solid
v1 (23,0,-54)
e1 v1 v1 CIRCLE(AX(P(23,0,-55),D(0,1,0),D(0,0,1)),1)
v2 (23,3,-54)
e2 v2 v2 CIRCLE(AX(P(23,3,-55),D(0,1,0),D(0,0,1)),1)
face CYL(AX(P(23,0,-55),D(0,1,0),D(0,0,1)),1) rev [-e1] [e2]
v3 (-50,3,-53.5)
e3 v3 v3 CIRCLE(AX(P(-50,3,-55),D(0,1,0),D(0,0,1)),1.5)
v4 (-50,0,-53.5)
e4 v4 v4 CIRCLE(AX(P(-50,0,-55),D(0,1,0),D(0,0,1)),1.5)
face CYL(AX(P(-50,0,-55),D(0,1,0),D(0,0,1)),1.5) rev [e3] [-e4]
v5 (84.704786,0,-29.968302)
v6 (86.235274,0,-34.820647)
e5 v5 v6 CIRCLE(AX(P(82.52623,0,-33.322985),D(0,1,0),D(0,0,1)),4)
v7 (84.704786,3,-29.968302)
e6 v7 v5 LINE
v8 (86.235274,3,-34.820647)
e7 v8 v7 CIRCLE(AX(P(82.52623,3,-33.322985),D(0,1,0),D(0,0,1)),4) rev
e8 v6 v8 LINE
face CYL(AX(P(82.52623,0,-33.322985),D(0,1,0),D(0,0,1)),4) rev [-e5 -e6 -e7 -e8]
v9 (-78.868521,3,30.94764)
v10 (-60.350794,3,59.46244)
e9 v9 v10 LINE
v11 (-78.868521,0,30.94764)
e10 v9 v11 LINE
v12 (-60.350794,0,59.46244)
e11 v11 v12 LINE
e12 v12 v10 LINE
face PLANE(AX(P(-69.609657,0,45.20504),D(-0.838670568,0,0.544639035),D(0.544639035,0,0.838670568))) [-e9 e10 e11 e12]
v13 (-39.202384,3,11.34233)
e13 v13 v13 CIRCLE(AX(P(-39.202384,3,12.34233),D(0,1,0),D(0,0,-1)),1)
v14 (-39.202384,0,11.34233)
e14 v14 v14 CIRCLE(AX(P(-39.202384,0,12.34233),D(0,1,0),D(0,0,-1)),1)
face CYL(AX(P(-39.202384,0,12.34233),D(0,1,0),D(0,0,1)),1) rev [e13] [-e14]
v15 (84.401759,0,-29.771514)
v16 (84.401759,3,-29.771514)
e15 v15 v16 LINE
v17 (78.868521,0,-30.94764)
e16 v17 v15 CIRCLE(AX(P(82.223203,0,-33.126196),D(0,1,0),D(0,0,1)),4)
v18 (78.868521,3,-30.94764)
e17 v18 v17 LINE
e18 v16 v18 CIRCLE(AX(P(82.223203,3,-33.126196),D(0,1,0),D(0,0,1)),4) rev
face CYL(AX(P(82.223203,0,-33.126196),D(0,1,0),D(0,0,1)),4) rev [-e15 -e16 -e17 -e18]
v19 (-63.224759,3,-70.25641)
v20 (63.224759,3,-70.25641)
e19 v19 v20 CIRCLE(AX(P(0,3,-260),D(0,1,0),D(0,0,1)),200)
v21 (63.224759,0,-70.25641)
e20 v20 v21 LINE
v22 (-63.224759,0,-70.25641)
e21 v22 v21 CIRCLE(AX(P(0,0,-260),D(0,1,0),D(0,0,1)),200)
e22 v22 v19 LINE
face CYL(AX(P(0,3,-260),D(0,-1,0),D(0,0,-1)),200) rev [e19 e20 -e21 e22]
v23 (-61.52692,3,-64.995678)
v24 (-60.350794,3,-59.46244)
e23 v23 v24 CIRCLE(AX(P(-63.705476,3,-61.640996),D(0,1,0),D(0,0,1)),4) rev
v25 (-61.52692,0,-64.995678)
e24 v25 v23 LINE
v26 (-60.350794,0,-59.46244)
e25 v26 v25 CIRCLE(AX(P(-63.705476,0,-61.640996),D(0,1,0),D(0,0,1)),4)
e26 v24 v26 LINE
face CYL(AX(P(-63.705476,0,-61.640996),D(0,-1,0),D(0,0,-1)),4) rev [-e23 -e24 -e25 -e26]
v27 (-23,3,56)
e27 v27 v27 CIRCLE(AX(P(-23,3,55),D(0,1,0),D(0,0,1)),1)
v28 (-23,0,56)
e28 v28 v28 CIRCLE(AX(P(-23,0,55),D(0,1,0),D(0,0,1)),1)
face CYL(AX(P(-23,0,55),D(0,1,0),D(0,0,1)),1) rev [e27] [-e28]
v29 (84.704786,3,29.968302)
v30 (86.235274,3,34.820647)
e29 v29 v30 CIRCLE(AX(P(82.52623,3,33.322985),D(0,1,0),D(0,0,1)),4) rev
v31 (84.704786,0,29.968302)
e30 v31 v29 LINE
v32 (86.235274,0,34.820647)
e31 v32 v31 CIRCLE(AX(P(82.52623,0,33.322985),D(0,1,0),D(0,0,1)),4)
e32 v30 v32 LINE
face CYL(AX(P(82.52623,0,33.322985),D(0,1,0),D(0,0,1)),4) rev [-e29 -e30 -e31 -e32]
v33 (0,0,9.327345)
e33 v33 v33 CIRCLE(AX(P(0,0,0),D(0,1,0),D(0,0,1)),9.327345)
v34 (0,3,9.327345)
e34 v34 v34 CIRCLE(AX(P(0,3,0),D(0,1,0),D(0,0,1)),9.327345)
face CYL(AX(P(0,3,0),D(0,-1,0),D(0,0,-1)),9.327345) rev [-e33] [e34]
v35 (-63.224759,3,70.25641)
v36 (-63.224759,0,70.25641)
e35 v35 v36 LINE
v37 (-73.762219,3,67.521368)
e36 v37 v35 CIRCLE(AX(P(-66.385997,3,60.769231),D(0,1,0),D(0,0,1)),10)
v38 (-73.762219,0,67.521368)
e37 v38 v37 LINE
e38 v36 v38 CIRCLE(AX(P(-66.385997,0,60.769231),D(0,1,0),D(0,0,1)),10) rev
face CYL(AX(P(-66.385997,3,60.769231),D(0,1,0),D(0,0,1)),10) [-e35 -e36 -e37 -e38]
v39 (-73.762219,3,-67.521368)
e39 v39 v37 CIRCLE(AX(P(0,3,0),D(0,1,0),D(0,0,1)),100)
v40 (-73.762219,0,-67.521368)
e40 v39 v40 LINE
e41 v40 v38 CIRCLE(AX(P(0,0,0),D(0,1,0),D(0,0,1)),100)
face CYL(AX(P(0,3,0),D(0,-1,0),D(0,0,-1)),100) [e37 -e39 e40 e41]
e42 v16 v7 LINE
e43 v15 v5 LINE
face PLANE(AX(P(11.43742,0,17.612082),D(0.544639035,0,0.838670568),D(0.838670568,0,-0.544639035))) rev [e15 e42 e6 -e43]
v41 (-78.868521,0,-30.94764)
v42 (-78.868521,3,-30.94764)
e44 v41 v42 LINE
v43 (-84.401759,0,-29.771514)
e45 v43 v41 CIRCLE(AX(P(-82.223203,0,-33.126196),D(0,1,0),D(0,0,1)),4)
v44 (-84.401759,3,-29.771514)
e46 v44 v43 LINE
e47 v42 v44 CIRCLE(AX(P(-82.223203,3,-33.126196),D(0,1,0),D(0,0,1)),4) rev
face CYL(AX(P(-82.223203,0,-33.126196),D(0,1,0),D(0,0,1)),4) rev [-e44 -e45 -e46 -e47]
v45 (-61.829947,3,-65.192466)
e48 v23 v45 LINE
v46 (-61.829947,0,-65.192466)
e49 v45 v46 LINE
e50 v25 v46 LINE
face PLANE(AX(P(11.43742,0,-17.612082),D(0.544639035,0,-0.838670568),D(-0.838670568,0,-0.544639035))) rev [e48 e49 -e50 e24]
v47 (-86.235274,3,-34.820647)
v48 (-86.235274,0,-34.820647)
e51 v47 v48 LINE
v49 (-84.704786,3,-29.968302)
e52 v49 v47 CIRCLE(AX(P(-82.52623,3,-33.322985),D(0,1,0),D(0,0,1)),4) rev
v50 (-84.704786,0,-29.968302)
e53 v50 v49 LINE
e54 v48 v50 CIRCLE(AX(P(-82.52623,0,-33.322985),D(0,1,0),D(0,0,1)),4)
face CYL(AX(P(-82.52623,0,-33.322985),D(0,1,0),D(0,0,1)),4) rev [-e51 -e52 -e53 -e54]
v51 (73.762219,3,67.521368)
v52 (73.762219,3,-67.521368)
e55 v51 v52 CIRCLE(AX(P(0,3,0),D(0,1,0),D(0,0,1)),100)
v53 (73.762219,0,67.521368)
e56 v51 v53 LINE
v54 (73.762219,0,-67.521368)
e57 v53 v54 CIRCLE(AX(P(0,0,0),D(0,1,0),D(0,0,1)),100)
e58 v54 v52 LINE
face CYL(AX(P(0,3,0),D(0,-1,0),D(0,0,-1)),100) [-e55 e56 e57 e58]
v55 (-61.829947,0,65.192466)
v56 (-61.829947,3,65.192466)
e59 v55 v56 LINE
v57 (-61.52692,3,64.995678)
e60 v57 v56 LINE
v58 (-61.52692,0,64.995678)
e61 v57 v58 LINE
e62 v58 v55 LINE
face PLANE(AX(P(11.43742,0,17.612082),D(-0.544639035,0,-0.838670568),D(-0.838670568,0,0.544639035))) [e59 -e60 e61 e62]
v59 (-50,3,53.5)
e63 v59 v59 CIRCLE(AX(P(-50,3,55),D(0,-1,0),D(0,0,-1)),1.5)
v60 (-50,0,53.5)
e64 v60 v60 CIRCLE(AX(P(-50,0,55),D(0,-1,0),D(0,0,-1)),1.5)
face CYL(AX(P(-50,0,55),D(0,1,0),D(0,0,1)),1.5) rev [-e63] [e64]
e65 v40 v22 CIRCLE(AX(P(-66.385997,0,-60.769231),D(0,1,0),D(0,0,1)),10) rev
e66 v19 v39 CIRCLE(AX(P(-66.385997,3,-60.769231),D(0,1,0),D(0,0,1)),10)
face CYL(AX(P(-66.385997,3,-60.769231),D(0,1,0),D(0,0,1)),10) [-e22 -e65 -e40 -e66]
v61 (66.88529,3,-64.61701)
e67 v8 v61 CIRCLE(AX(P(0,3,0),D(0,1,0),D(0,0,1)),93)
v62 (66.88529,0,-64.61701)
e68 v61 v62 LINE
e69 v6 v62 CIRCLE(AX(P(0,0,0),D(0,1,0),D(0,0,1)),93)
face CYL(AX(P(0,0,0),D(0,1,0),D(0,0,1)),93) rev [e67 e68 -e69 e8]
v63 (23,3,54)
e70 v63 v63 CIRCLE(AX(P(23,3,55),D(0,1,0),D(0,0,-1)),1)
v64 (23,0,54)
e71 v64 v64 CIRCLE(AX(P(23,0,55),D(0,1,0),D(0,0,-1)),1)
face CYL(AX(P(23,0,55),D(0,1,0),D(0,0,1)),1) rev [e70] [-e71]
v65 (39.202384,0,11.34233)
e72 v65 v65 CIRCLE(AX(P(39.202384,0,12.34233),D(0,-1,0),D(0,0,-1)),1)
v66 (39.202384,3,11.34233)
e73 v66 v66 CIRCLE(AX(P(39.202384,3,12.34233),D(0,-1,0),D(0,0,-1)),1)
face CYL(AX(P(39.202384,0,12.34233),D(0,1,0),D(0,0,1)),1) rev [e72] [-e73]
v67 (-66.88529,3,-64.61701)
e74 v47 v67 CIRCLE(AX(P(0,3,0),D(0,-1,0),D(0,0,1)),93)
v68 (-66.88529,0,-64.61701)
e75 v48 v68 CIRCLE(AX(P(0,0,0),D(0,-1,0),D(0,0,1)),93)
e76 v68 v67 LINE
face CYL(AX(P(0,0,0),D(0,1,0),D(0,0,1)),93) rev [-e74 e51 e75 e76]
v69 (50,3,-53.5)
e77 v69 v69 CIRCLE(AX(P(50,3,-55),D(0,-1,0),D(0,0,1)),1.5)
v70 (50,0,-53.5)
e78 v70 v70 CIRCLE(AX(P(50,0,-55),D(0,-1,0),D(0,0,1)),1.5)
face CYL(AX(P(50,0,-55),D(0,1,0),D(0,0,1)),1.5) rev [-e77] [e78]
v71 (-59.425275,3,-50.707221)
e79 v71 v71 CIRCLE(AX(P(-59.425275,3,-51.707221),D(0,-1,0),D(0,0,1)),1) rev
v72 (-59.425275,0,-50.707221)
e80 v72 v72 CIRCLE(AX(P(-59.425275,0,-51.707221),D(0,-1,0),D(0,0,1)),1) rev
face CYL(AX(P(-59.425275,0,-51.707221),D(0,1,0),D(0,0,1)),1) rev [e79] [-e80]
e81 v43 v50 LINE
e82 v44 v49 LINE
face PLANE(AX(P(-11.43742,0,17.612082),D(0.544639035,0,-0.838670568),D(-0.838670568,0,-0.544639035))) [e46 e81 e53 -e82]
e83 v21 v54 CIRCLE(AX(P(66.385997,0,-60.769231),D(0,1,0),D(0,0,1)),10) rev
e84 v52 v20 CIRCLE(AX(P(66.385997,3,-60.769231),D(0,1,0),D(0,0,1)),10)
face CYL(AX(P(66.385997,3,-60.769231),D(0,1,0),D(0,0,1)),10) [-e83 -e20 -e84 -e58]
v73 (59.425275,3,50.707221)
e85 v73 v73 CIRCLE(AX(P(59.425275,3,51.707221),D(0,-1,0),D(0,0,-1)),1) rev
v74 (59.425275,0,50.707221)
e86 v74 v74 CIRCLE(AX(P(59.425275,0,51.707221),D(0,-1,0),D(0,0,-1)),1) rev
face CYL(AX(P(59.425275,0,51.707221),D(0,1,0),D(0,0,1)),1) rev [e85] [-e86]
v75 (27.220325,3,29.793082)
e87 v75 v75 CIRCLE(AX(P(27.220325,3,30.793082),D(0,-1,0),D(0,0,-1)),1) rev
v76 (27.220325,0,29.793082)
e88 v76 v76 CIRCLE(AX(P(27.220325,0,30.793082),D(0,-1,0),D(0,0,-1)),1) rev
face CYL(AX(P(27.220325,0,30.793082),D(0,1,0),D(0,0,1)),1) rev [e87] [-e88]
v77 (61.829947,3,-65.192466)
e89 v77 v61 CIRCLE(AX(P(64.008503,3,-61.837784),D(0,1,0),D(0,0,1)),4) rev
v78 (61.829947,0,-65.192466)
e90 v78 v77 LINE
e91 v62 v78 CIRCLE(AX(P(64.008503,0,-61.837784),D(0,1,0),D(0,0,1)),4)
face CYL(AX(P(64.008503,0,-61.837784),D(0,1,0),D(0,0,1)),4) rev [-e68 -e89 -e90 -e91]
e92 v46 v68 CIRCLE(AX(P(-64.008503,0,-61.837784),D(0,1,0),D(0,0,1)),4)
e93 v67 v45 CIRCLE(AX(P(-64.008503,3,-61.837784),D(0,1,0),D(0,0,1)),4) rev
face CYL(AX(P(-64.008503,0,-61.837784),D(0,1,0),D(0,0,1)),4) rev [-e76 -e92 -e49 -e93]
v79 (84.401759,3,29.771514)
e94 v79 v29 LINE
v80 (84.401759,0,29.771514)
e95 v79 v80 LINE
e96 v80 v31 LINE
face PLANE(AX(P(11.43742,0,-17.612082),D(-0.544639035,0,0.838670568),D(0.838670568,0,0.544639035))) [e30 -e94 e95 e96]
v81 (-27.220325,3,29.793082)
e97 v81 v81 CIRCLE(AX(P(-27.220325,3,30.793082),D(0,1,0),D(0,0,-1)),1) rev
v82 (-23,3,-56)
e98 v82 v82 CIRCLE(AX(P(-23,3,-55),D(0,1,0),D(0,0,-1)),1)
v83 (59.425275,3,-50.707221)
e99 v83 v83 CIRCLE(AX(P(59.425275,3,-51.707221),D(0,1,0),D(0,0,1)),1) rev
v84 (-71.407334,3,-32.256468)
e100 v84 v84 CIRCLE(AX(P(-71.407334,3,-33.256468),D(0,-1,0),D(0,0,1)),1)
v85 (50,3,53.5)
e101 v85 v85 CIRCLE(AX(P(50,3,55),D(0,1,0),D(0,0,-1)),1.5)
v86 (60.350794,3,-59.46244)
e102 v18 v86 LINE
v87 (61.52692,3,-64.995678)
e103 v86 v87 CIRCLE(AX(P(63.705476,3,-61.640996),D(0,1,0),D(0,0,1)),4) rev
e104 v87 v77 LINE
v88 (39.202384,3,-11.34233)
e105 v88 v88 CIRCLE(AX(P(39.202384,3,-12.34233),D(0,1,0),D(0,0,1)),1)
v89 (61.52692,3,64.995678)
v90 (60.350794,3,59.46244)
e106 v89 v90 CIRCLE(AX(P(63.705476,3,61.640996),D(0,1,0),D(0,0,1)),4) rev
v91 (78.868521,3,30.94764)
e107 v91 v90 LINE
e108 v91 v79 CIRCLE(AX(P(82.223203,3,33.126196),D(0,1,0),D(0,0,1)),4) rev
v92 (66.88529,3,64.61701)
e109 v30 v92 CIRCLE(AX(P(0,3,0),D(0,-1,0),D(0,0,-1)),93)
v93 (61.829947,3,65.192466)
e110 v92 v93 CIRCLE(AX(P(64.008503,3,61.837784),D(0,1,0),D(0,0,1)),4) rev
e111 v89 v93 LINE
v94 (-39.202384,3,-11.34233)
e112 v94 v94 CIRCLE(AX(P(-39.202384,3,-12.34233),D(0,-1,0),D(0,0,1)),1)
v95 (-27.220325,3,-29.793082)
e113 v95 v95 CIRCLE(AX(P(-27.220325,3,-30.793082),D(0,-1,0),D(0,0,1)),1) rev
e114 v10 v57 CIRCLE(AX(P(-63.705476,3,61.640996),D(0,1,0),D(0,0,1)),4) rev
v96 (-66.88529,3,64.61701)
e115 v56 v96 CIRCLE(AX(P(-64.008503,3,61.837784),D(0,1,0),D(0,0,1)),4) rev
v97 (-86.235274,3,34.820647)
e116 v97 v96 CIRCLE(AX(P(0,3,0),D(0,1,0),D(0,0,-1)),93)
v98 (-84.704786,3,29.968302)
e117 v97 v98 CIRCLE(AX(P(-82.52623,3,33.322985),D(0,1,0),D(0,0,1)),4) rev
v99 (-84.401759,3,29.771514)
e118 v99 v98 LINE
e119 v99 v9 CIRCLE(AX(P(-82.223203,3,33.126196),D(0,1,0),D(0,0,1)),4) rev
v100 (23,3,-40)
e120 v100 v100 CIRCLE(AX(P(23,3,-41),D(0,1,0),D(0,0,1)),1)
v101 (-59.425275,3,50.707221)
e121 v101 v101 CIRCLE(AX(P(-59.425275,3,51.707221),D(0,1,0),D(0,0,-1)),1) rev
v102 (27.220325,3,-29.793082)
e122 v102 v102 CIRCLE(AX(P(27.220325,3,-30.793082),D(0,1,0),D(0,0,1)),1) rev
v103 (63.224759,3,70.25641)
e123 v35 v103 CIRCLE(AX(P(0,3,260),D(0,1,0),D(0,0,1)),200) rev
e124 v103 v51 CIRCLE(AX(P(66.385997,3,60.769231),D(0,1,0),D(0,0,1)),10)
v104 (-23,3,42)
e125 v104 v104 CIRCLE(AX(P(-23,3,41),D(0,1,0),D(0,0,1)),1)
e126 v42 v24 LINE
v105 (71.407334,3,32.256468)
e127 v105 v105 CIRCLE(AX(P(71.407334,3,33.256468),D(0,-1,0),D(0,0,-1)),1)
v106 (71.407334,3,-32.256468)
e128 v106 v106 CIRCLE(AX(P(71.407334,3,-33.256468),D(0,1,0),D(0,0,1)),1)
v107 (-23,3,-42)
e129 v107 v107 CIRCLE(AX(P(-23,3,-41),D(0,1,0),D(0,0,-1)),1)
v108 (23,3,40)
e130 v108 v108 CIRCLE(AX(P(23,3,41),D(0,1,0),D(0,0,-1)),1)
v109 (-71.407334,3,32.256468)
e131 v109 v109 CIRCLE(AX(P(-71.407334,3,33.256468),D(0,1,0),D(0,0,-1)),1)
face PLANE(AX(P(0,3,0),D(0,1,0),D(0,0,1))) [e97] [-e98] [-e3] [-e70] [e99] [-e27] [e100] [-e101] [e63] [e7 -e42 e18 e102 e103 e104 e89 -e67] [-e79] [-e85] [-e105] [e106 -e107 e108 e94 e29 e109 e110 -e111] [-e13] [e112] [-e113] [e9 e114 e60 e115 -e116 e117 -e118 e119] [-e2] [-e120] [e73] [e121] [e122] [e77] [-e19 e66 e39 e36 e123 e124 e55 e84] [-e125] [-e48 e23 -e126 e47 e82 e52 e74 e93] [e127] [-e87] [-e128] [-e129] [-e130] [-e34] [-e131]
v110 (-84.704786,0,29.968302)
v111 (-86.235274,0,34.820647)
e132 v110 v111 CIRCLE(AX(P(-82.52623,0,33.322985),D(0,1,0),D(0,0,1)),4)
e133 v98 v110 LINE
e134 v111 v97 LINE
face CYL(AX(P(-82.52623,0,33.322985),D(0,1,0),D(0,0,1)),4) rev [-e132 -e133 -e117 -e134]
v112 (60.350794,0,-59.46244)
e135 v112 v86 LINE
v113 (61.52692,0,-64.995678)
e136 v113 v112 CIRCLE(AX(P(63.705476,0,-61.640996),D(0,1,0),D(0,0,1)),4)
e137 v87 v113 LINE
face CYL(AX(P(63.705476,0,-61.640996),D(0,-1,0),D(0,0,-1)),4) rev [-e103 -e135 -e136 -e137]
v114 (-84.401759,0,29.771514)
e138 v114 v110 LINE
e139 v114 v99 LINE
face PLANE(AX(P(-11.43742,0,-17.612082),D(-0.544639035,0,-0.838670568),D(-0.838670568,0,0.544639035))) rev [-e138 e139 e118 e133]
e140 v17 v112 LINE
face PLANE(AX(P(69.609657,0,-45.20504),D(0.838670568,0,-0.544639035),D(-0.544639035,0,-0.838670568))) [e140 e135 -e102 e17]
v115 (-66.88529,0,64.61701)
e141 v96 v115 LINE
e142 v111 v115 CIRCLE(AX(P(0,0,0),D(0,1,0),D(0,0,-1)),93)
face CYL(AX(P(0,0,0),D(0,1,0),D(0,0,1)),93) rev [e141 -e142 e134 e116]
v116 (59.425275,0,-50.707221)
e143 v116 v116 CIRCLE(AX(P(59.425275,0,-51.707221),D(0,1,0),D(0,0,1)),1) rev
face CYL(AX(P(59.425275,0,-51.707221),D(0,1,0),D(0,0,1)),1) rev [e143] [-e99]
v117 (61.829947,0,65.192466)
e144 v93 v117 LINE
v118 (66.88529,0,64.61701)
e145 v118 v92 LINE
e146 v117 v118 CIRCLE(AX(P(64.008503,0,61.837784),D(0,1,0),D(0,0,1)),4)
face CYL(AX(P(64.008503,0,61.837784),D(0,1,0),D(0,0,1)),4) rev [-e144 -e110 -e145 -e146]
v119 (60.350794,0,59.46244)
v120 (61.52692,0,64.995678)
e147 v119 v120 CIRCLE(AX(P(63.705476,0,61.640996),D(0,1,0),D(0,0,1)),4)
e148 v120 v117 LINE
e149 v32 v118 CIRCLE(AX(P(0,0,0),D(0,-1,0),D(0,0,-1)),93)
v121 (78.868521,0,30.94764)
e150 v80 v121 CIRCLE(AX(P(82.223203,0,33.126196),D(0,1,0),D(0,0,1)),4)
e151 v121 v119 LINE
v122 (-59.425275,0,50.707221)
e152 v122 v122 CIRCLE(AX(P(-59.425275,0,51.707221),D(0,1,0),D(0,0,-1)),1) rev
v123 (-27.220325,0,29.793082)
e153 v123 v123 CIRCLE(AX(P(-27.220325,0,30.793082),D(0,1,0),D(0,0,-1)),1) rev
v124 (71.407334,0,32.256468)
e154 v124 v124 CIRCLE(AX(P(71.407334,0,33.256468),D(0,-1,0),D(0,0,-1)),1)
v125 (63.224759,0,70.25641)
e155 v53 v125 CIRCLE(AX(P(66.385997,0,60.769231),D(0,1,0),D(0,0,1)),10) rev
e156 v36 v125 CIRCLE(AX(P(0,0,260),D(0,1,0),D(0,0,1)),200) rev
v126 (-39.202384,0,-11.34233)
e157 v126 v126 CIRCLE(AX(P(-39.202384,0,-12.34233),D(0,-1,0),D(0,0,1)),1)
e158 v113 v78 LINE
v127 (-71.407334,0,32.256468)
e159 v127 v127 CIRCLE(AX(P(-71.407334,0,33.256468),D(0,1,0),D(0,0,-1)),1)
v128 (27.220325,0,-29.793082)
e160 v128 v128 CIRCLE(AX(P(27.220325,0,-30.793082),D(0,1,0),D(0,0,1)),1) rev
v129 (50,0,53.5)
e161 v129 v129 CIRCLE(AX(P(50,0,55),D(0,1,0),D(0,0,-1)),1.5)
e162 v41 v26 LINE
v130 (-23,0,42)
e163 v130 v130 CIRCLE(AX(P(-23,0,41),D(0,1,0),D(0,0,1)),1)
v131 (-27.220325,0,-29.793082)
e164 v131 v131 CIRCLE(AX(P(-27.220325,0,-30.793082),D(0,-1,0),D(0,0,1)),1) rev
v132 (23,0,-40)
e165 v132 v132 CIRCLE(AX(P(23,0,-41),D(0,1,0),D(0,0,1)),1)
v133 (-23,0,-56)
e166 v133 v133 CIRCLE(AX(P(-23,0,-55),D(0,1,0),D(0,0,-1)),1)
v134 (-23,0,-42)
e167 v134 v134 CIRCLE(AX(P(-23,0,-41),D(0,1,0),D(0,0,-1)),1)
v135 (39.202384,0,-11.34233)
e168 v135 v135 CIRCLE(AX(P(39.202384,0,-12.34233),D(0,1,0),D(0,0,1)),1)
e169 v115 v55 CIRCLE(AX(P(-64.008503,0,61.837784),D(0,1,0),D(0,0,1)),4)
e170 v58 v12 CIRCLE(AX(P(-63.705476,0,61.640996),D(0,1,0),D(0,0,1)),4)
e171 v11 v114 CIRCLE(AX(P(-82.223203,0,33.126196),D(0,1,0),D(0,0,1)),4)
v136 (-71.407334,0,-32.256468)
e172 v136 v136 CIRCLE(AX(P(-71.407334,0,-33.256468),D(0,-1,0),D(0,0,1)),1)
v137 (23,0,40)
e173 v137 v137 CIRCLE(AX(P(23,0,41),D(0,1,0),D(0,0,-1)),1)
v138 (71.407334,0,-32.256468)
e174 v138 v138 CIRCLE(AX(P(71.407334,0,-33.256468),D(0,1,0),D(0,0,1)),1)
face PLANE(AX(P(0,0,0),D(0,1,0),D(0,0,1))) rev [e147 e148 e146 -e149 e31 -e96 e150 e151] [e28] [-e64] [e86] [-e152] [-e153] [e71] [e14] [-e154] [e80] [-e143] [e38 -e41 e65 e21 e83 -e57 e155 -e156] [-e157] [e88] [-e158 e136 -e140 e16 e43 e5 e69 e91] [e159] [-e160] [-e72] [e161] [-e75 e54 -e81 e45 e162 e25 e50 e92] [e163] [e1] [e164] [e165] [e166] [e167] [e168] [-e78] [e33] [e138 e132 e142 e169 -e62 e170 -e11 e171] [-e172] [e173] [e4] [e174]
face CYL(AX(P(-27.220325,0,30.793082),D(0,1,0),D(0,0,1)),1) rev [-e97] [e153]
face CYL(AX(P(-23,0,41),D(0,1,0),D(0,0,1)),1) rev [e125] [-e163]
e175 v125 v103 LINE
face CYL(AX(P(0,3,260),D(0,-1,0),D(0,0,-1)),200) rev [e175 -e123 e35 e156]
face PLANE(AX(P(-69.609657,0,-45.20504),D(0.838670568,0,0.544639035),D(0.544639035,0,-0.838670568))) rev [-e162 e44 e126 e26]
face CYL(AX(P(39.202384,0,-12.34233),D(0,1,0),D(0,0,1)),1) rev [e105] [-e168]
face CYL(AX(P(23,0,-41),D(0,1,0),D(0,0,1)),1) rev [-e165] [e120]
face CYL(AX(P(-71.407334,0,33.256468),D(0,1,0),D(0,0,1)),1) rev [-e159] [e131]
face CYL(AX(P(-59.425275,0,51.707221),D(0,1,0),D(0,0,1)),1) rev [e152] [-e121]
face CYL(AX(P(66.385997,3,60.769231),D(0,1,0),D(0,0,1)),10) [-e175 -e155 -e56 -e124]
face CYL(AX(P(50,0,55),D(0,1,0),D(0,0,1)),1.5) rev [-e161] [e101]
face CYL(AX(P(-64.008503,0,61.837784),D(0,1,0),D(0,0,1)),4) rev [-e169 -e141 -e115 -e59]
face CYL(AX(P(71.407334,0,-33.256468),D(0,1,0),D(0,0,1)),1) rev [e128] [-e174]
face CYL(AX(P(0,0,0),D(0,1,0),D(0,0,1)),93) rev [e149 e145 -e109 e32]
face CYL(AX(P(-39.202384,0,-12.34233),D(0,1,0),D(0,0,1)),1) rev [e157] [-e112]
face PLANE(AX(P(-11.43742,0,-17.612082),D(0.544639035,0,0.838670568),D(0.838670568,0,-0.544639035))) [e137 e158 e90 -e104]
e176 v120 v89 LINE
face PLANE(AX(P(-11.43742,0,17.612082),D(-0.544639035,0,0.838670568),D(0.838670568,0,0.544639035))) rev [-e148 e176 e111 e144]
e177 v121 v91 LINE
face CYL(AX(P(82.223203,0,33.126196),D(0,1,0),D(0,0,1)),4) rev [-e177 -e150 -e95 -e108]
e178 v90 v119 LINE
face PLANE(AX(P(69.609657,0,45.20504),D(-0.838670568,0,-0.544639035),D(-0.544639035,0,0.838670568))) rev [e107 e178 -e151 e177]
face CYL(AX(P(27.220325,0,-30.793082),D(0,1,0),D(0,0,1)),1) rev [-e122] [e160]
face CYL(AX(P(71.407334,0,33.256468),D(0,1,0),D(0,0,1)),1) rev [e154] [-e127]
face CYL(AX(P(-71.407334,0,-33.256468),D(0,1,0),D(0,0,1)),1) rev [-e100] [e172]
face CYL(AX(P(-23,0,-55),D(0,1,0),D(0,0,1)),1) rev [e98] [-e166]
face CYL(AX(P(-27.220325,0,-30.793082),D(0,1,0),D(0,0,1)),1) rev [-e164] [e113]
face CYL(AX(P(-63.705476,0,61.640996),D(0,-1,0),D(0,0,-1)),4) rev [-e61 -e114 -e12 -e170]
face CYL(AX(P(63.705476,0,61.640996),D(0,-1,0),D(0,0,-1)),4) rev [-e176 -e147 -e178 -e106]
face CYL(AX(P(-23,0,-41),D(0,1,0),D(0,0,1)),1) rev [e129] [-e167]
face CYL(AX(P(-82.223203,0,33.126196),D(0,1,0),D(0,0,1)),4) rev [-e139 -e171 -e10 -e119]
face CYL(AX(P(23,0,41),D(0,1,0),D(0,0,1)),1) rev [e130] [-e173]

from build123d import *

# Parameters (mm, degrees)
ESBO_O1_R                 = 9.327345029
RESSALTO_EXTRUS_O1_DEPTH  = 3
FILETE1_R                 = 10
ESBO_O2_R                 = 1
CORTE_EXTRUS_O1_DEPTH     = 123.545028697
FILETE3_R                 = 4
FILETE3_OF_ESPELHAR1_R    = 4
ESPELHAR2_OUTLINE_R       = 1
ESPELHAR2_DEPTH           = 3
ESBO_O4_R                 = 1.5
CORTE_EXTRUS_O3_DEPTH     = 123.545028697
ESPELHAR4_COPY_1_SKETCH_R = 1.5
ESPELHAR4_COPY_1_DEPTH    = 123.545028697
ESBO_O5_R                 = 1
CORTE_EXTRUS_O4_DEPTH     = 123.545028697


# Read off the part's stored shape, not the designer's step: Espelhar2
with BuildPart() as part:
    # Esboço1 → Ressalto-extrusão1 (new body)
    with BuildSketch(Plane(origin=(0, 0, 0), x_dir=(1, 0, 0), z_dir=(0, 1, 0))):
        with BuildLine():
            ThreePointArc((69.076751756, -72.307692308), (91.944752911, -39.321271752), (100, 0))
            ThreePointArc((100, 0), (91.944752911, 39.321271752), (69.076751756, 72.307692308))
            ThreePointArc((69.076751756, 72.307692308), (0, 60), (-69.076751756, 72.307692308))
            ThreePointArc((-69.076751756, 72.307692308), (-100, 0), (-69.076751756, -72.307692308))
            ThreePointArc((-69.076751756, -72.307692308), (0, -60), (69.076751756, -72.307692308))
        make_face()
        with Locations(Location((0, 0, 0), (0, 0, 270))):
            Circle(ESBO_O1_R, mode=Mode.SUBTRACT)
    extrude(amount=RESSALTO_EXTRUS_O1_DEPTH)

    # Filete1
    filete1_edges = [part.edges().sort_by_distance(p)[0] for p in [
        (-69.076751756, 1.5, -72.307692308),
        (69.076751756, 1.5, -72.307692308),
        (69.076751756, 1.5, 72.307692308),
        (-69.076751756, 1.5, 72.307692308),
    ]]
    fillet(filete1_edges, radius=FILETE1_R)

    # Esboço2 → Corte-extrusão1 (cut, through all)
    with BuildSketch(Plane(origin=(0, 3, 0), x_dir=(1, 0, 0), z_dir=(0, 1, 0))):
        with BuildLine():
            Line((58.172237404, 62.817121833), (81.047076875, 27.592957979))
            Line((81.047076875, 27.592957979), (87.41930694, 31.731132569))
            ThreePointArc((87.41930694, 31.731132569), (83.247103811, 41.459856573), (77.996361738, 50.651431921))
            ThreePointArc((77.996361738, 50.651431921), (71.735109934, 59.186772195), (64.544467469, 66.955296423))
            Line((64.544467469, 66.955296423), (58.172237404, 62.817121833))
        make_face()
        with Locations(Location((27.220325105, 30.793082034, 0), (0, 0, 270))):
            Circle(ESBO_O2_R)
        with Locations(Location((39.202383876, 12.342329539, 0), (0, 0, 270))):
            Circle(ESBO_O2_R)
        with Locations(Location((59.425274915, 51.707220979, 0), (0, 0, 270))):
            Circle(ESBO_O2_R)
        with Locations(Location((71.407333685, 33.256468484, 0), (0, 0, 270))):
            Circle(ESBO_O2_R)
    corte_extrus_o1 = extrude(amount=-CORTE_EXTRUS_O1_DEPTH, mode=Mode.SUBTRACT)

    # Filete3
    filete3_edges = [part.edges().sort_by_distance(p)[0] for p in [
        (87.41930694, 1.5, -31.731132569),
        (81.047076875, 1.5, -27.592957979),
        (58.172237404, 1.5, -62.817121833),
        (64.544467469, 1.5, -66.955296423),
    ]]
    fillet(filete3_edges, radius=FILETE3_R)

    # Espelhar1: Corte-extrusão1 across plane
    add(corte_extrus_o1.mirror(Plane(origin=(0, 0, 0), x_dir=(0, 0, 1), z_dir=(1, 0, 0))), mode=Mode.SUBTRACT)

    # Filete3 of Espelhar1
    filete3_of_espelhar1_edges = [part.edges().sort_by_distance(p)[0] for p in [
        (-87.41930694, 1.5, -31.731132569),
        (-81.047076875, 1.5, -27.592957979),
        (-58.172237404, 1.5, -62.817121833),
        (-64.544467469, 1.5, -66.955296423),
    ]]
    fillet(filete3_of_espelhar1_edges, radius=FILETE3_OF_ESPELHAR1_R)

    # Espelhar2 outline → Espelhar2 (cut)
    with BuildSketch(Plane(origin=(0, 0, 0), x_dir=(1, 0, 0), z_dir=(0, 1, 0))):
        with BuildLine():
            Line((-61.829947011, -65.192466226), (-61.526919676, -64.995677973))
            ThreePointArc((-61.526919676, -64.995677973), (-59.792885413, -62.472642464), (-60.350793544, -59.462439561))
            Line((-60.350793544, -59.462439561), (-78.868520735, -30.947640251))
            ThreePointArc((-78.868520735, -30.947640251), (-81.391556244, -29.213605988), (-84.401759147, -29.771514119))
            Line((-84.401759147, -29.771514119), (-84.704786482, -29.968302372))
            ThreePointArc((-84.704786482, -29.968302372), (-86.340974216, -32.119768464), (-86.235274402, -34.820646875))
            ThreePointArc((-86.235274402, -34.820646875), (-77.996362819, -50.651430256), (-66.88528981, -64.617010199))
            ThreePointArc((-66.88528981, -64.617010199), (-64.460906593, -65.812118002), (-61.829947011, -65.192466226))
        make_face()
        with BuildLine():
            ThreePointArc((61.829947011, -65.192466226), (64.460906593, -65.812118002), (66.88528981, -64.617010199))
            ThreePointArc((66.88528981, -64.617010199), (77.996362819, -50.651430256), (86.235274402, -34.820646875))
            ThreePointArc((86.235274402, -34.820646875), (86.340974216, -32.119768464), (84.704786482, -29.968302372))
            Line((84.704786482, -29.968302372), (84.401759147, -29.771514119))
            ThreePointArc((84.401759147, -29.771514119), (81.391556244, -29.213605988), (78.868520735, -30.947640251))
            Line((78.868520735, -30.947640251), (60.350793544, -59.462439561))
            ThreePointArc((60.350793544, -59.462439561), (59.792885413, -62.472642464), (61.526919676, -64.995677973))
            Line((61.526919676, -64.995677973), (61.829947011, -65.192466226))
        make_face()
        with Locations((-27.220325105, -30.793082034)):
            Circle(ESPELHAR2_OUTLINE_R)
        with Locations((-39.202383876, -12.342329539)):
            Circle(ESPELHAR2_OUTLINE_R)
        with Locations((-59.425274915, -51.707220979)):
            Circle(ESPELHAR2_OUTLINE_R)
        with Locations((-71.407333685, -33.256468484)):
            Circle(ESPELHAR2_OUTLINE_R)
        with Locations((27.220325105, -30.793082034)):
            Circle(ESPELHAR2_OUTLINE_R)
        with Locations((39.202383876, -12.342329539)):
            Circle(ESPELHAR2_OUTLINE_R)
        with Locations((59.425274915, -51.707220979)):
            Circle(ESPELHAR2_OUTLINE_R)
        with Locations((71.407333685, -33.256468484)):
            Circle(ESPELHAR2_OUTLINE_R)
    extrude(amount=ESPELHAR2_DEPTH, mode=Mode.SUBTRACT)

    # Esboço4 → Corte-extrusão3 (cut, through all)
    with BuildSketch(Plane(origin=(0, 3, 0), x_dir=(1, 0, 0), z_dir=(0, 1, 0))):
        with Locations(Location((-50, 55, 0), (0, 0, 270))):
            Circle(ESBO_O4_R)
    corte_extrus_o3 = extrude(amount=-CORTE_EXTRUS_O3_DEPTH, mode=Mode.SUBTRACT)

    # Espelhar3: Corte-extrusão3 across plane
    add(corte_extrus_o3.mirror(Plane(origin=(0, 0, 0), x_dir=(0, 0, 1), z_dir=(1, 0, 0))), mode=Mode.SUBTRACT)

    # Espelhar4: Corte-extrusão3 across plane
    add(corte_extrus_o3.mirror(Plane.XY), mode=Mode.SUBTRACT)

    # Espelhar4 copy 1 sketch → Espelhar4 copy 1 (cut, through all)
    with BuildSketch(Plane(origin=(0, 3, 0), x_dir=(-1, 0, 0), z_dir=(0, 1, 0))):
        with Locations(Location((-50, 55, 0), (0, 0, 270))):
            Circle(ESPELHAR4_COPY_1_SKETCH_R)
    extrude(amount=-ESPELHAR4_COPY_1_DEPTH, mode=Mode.SUBTRACT)

    # Esboço5 → Corte-extrusão4 (cut, through all)
    with BuildSketch(Plane(origin=(0, 3, 0), x_dir=(1, 0, 0), z_dir=(0, 1, 0))):
        with Locations(Location((23, 55, 0), (0, 0, 270))):
            Circle(ESBO_O5_R)
        with Locations(Location((23, 41, 0), (0, 0, 270))):
            Circle(ESBO_O5_R)
        with Locations(Location((-23, 55, 0), (0, 0, 90))):
            Circle(ESBO_O5_R)
        with Locations(Location((-23, 41, 0), (0, 0, 90))):
            Circle(ESBO_O5_R)
        with Locations(Location((-23, -41, 0), (0, 0, 270))):
            Circle(ESBO_O5_R)
        with Locations(Location((-23, -55, 0), (0, 0, 270))):
            Circle(ESBO_O5_R)
        with Locations(Location((23, -55, 0), (0, 0, 90))):
            Circle(ESBO_O5_R)
        with Locations(Location((23, -41, 0), (0, 0, 90))):
            Circle(ESBO_O5_R)
    extrude(amount=-CORTE_EXTRUS_O4_DEPTH, mode=Mode.SUBTRACT)


solid = part.part
